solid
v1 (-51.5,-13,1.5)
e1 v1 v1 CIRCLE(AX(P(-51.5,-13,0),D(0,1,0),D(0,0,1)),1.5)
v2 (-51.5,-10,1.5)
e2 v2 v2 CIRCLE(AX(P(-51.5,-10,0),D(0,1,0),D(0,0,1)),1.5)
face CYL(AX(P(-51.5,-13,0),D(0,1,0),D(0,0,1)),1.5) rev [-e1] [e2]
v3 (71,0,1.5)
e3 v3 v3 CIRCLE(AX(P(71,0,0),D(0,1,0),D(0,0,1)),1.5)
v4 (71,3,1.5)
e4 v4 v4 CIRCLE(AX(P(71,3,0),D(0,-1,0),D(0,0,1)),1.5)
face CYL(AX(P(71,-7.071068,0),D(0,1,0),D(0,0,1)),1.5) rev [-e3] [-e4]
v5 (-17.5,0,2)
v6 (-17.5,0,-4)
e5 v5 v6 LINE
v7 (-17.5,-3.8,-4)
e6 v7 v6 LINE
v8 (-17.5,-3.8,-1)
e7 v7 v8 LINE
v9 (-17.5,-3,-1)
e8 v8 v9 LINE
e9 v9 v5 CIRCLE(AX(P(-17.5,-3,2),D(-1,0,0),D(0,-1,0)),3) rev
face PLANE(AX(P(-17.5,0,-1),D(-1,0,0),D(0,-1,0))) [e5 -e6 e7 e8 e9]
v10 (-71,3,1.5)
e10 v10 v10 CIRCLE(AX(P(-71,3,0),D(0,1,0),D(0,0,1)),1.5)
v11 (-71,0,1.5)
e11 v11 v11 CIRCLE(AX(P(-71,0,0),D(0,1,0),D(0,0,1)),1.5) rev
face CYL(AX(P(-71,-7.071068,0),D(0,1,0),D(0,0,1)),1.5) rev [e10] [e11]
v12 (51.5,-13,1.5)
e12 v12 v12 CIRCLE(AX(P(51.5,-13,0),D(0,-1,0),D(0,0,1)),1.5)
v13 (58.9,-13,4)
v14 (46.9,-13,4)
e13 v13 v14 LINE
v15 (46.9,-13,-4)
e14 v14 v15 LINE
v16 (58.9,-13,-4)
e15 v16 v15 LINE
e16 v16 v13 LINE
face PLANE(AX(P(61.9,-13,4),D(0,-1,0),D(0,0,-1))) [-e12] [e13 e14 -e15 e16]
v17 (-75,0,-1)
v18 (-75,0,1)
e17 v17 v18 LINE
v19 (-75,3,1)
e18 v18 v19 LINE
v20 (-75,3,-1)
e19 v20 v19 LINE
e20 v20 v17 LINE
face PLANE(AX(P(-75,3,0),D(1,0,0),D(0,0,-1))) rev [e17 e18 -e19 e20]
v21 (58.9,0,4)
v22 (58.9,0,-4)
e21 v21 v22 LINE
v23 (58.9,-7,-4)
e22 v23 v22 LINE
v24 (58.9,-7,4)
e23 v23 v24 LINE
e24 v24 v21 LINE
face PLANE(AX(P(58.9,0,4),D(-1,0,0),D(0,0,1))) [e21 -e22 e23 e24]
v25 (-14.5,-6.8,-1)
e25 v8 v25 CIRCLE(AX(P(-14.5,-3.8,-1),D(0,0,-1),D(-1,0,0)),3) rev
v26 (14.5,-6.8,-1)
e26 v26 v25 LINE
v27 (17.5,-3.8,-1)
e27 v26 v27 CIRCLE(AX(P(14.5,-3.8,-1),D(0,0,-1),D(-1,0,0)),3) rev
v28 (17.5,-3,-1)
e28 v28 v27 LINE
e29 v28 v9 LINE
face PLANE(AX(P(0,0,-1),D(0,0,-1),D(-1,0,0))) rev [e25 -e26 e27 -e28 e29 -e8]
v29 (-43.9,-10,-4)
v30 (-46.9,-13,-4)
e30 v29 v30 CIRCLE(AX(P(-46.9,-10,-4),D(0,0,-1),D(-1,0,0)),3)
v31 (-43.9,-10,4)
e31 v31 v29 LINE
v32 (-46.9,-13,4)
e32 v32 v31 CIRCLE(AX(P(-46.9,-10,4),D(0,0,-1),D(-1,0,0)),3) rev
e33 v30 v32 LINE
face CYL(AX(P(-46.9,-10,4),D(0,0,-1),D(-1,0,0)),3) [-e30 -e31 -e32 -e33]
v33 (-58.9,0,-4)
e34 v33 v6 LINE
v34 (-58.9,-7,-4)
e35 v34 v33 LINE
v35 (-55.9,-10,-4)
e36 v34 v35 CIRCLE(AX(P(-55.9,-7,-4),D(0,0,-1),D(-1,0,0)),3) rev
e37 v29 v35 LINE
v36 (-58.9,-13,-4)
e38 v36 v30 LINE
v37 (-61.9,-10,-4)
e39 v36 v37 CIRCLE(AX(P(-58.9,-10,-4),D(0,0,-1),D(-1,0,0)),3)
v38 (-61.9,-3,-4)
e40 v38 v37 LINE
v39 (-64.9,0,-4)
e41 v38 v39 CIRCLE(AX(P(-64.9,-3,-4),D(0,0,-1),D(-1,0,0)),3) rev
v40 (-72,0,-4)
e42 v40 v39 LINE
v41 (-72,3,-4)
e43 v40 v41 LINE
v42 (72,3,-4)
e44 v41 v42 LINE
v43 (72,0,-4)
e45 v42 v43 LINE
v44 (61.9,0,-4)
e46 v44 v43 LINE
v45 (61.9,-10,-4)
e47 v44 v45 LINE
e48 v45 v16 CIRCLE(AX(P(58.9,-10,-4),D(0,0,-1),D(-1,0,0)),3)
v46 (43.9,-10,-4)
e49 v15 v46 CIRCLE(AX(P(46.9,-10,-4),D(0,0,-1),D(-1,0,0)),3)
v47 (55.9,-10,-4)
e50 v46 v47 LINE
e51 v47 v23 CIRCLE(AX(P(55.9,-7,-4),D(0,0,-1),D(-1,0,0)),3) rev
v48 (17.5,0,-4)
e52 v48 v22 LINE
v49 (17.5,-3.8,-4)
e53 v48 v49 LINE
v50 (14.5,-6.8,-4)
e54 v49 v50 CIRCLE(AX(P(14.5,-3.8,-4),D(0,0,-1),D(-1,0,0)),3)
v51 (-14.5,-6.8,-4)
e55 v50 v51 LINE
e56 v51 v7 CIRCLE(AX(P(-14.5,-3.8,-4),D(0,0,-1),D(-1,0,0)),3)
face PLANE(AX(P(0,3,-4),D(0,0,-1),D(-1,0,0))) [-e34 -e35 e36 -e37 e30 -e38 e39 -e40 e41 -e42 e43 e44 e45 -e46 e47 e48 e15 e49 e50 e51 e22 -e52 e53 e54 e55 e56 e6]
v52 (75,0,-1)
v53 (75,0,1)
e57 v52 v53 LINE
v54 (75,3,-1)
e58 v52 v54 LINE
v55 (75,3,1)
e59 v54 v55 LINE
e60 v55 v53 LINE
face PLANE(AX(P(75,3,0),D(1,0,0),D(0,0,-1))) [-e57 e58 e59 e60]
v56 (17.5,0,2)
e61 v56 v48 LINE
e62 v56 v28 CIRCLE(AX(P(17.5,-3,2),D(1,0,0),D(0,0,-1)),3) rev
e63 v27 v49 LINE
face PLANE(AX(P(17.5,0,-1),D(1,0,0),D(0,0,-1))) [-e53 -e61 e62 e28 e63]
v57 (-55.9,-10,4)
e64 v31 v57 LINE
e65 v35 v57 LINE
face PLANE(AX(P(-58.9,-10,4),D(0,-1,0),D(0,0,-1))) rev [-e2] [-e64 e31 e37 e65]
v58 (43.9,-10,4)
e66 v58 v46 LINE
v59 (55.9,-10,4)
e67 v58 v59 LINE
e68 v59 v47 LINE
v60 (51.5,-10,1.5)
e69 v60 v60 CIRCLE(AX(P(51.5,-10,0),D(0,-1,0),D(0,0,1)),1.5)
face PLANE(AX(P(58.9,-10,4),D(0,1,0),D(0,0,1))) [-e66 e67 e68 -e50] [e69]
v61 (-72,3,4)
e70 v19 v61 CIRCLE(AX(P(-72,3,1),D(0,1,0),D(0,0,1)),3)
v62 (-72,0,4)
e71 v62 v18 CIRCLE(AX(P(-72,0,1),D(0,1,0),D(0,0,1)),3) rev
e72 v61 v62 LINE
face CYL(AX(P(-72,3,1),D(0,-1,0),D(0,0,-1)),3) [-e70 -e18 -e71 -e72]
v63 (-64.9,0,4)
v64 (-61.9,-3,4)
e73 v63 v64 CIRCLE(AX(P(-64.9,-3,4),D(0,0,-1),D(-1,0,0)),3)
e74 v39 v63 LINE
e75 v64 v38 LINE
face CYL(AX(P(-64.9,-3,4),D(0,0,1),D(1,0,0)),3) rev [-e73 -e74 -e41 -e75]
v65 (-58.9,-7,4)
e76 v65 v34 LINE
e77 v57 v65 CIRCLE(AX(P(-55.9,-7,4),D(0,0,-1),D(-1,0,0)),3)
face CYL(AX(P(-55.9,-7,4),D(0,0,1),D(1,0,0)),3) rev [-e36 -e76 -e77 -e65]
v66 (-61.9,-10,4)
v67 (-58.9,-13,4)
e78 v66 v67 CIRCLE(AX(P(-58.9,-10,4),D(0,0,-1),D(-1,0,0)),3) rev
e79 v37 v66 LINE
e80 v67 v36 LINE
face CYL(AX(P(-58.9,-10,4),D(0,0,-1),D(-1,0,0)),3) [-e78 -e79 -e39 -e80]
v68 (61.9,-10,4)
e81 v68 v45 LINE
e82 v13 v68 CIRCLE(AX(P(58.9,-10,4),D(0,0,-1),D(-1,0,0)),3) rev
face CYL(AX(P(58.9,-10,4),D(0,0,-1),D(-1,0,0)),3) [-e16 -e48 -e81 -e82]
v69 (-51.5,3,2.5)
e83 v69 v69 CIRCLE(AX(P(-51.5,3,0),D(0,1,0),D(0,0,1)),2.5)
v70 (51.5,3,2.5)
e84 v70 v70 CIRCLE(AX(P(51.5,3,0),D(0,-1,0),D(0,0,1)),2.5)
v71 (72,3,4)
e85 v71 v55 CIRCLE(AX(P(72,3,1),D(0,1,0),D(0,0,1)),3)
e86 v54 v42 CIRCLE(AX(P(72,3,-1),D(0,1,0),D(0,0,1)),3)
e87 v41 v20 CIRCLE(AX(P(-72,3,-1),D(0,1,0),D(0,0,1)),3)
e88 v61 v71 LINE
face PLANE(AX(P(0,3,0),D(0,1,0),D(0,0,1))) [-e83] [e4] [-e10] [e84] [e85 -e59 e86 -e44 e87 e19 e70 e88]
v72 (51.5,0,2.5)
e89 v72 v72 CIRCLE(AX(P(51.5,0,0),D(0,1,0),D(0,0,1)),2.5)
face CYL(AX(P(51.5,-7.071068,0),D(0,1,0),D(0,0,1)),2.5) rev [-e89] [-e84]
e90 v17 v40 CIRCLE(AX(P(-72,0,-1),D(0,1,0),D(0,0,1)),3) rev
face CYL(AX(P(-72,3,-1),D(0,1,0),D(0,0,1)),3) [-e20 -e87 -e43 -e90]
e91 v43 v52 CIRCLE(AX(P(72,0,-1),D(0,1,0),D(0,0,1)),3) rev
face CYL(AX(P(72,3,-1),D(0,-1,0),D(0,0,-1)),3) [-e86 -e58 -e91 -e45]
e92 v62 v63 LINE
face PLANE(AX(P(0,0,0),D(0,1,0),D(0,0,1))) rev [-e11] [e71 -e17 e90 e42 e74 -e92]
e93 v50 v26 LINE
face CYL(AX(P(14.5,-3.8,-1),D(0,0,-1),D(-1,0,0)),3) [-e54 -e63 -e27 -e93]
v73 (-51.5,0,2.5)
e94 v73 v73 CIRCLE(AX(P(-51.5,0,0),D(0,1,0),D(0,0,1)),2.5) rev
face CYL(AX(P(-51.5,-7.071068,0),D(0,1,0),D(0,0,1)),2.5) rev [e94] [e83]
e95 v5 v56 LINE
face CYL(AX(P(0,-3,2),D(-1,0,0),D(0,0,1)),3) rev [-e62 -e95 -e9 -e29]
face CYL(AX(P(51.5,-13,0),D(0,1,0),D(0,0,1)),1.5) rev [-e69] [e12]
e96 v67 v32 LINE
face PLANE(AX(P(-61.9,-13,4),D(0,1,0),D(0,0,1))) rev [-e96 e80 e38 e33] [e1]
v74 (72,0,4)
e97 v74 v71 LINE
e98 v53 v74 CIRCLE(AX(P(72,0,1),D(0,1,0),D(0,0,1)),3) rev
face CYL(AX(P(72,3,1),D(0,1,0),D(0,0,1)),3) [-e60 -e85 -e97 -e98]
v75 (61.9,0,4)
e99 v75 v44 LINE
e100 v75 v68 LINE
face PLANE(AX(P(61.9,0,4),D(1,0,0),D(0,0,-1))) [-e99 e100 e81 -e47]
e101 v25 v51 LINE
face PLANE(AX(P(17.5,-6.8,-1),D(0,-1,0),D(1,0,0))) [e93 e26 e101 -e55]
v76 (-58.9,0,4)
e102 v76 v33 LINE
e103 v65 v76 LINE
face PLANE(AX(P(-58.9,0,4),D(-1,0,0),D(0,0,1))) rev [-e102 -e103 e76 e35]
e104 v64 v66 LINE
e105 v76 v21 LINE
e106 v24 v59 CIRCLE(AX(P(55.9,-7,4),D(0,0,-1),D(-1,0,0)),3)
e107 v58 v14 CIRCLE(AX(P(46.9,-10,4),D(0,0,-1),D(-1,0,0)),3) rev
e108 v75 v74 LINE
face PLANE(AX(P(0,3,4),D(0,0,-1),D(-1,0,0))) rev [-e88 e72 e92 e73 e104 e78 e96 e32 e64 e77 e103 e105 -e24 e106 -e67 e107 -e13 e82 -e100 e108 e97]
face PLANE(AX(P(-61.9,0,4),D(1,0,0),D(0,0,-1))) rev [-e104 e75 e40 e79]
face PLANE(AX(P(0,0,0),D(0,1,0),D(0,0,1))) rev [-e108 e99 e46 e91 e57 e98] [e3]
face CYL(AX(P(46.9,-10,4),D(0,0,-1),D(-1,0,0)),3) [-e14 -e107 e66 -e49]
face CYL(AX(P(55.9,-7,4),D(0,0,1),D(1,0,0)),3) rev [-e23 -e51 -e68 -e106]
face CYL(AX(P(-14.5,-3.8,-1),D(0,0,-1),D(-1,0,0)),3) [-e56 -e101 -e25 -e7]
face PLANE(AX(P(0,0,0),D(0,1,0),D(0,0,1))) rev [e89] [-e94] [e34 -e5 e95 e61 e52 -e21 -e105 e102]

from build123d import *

# Parameters (mm, degrees)
BOSS_EXTRUDE1_DEPTH = 3
BOSS_EXTRUDE2_DEPTH = 4
SKETCH4_R           = 1.5
SKETCH4_R_2         = 2.5
CUT_EXTRUDE1_DEPTH  = 3
SKETCH5_R           = 1.5
CUT_EXTRUDE2_DEPTH  = 77.223356001
SKETCH6_W           = 35
SKETCH6_H           = 6.8
BOSS_EXTRUDE3_DEPTH = 3
FILLET1_R           = 3


with BuildPart() as part:
    # Sketch2 → Boss-Extrude1 (new body)
    with BuildSketch(Plane(origin=(0, 0, 0), x_dir=(1, 0, 0), z_dir=(0, 1, 0))):
        Polygon((-75, 4), (-75, -4), (75, -4), align=None)
        Polygon((75, 4), (75, -4), (-75, 4), align=None)
    extrude(amount=BOSS_EXTRUDE1_DEPTH)

    # Sketch3 → Boss-Extrude2 (add, symmetric)
    with BuildSketch(Plane.XY):
        Polygon((-58.9, 0), (-58.9, -10), (-43.9, -10), (-43.9, -13), (-61.9, -13), (-61.9, 0), align=None)
    boss_extrude2 = extrude(amount=BOSS_EXTRUDE2_DEPTH, both=True)

    # Sketch4 → Cut-Extrude1 (cut)
    with BuildSketch(Plane(origin=(0, 3, 0), x_dir=(1, 0, 0), z_dir=(0, 1, 0))):
        with Locations(Location((-71, 0, 0), (0, 0, 270))):
            Circle(SKETCH4_R)
        with Locations(Location((-51.5, 0, 0), (0, 0, 270))):
            Circle(SKETCH4_R_2)
    cut_extrude1 = extrude(amount=-CUT_EXTRUDE1_DEPTH, mode=Mode.SUBTRACT)

    # Sketch5 → Cut-Extrude2 (cut, through all)
    with BuildSketch(Plane(origin=(0, -10, 0), x_dir=(1, 0, 0), z_dir=(0, 1, 0))):
        with Locations(Location((-51.5, 0, 0), (0, 0, 270))):
            Circle(SKETCH5_R)
    cut_extrude2 = extrude(amount=-CUT_EXTRUDE2_DEPTH, mode=Mode.SUBTRACT)

    # Mirror1: Boss-Extrude2, Cut-Extrude1, Cut-Extrude2 across plane
    add(boss_extrude2.mirror(Plane(origin=(0, 0, 0), x_dir=(0, 0, 1), z_dir=(1, 0, 0))))
    add(cut_extrude1.mirror(Plane(origin=(0, 0, 0), x_dir=(0, 0, 1), z_dir=(1, 0, 0))), mode=Mode.SUBTRACT)
    add(cut_extrude2.mirror(Plane(origin=(0, 0, 0), x_dir=(0, 0, 1), z_dir=(1, 0, 0))), mode=Mode.SUBTRACT)

    # Sketch6 → Boss-Extrude3 (add)
    with BuildSketch(Plane(origin=(0, 0, -4), x_dir=(-1, 0, 0), z_dir=(0, 0, -1))):
        with Locations((0, -3.4)):
            Rectangle(SKETCH6_W, SKETCH6_H)
    extrude(amount=-BOSS_EXTRUDE3_DEPTH)

    # Fillet1
    fillet1_edges = [part.edges().sort_by_distance(p)[0] for p in [
        (-61.9, 0, 0),
        (-61.9, -13, 0),
        (-43.9, -13, 0),
        (-58.9, -10, 0),
        (58.9, -10, 0),
        (43.9, -13, 0),
        (61.9, -13, 0),
        (17.5, -6.8, -2.5),
        (0, 0, -1),
        (-17.5, -6.8, -2.5),
        (-75, 1.5, -4),
        (75, 1.5, -4),
        (75, 1.5, 4),
        (-75, 1.5, 4),
    ]]
    fillet(fillet1_edges, radius=FILLET1_R - 0.0001)  # a hair under: the kernel refuses the full size


solid = part.part
